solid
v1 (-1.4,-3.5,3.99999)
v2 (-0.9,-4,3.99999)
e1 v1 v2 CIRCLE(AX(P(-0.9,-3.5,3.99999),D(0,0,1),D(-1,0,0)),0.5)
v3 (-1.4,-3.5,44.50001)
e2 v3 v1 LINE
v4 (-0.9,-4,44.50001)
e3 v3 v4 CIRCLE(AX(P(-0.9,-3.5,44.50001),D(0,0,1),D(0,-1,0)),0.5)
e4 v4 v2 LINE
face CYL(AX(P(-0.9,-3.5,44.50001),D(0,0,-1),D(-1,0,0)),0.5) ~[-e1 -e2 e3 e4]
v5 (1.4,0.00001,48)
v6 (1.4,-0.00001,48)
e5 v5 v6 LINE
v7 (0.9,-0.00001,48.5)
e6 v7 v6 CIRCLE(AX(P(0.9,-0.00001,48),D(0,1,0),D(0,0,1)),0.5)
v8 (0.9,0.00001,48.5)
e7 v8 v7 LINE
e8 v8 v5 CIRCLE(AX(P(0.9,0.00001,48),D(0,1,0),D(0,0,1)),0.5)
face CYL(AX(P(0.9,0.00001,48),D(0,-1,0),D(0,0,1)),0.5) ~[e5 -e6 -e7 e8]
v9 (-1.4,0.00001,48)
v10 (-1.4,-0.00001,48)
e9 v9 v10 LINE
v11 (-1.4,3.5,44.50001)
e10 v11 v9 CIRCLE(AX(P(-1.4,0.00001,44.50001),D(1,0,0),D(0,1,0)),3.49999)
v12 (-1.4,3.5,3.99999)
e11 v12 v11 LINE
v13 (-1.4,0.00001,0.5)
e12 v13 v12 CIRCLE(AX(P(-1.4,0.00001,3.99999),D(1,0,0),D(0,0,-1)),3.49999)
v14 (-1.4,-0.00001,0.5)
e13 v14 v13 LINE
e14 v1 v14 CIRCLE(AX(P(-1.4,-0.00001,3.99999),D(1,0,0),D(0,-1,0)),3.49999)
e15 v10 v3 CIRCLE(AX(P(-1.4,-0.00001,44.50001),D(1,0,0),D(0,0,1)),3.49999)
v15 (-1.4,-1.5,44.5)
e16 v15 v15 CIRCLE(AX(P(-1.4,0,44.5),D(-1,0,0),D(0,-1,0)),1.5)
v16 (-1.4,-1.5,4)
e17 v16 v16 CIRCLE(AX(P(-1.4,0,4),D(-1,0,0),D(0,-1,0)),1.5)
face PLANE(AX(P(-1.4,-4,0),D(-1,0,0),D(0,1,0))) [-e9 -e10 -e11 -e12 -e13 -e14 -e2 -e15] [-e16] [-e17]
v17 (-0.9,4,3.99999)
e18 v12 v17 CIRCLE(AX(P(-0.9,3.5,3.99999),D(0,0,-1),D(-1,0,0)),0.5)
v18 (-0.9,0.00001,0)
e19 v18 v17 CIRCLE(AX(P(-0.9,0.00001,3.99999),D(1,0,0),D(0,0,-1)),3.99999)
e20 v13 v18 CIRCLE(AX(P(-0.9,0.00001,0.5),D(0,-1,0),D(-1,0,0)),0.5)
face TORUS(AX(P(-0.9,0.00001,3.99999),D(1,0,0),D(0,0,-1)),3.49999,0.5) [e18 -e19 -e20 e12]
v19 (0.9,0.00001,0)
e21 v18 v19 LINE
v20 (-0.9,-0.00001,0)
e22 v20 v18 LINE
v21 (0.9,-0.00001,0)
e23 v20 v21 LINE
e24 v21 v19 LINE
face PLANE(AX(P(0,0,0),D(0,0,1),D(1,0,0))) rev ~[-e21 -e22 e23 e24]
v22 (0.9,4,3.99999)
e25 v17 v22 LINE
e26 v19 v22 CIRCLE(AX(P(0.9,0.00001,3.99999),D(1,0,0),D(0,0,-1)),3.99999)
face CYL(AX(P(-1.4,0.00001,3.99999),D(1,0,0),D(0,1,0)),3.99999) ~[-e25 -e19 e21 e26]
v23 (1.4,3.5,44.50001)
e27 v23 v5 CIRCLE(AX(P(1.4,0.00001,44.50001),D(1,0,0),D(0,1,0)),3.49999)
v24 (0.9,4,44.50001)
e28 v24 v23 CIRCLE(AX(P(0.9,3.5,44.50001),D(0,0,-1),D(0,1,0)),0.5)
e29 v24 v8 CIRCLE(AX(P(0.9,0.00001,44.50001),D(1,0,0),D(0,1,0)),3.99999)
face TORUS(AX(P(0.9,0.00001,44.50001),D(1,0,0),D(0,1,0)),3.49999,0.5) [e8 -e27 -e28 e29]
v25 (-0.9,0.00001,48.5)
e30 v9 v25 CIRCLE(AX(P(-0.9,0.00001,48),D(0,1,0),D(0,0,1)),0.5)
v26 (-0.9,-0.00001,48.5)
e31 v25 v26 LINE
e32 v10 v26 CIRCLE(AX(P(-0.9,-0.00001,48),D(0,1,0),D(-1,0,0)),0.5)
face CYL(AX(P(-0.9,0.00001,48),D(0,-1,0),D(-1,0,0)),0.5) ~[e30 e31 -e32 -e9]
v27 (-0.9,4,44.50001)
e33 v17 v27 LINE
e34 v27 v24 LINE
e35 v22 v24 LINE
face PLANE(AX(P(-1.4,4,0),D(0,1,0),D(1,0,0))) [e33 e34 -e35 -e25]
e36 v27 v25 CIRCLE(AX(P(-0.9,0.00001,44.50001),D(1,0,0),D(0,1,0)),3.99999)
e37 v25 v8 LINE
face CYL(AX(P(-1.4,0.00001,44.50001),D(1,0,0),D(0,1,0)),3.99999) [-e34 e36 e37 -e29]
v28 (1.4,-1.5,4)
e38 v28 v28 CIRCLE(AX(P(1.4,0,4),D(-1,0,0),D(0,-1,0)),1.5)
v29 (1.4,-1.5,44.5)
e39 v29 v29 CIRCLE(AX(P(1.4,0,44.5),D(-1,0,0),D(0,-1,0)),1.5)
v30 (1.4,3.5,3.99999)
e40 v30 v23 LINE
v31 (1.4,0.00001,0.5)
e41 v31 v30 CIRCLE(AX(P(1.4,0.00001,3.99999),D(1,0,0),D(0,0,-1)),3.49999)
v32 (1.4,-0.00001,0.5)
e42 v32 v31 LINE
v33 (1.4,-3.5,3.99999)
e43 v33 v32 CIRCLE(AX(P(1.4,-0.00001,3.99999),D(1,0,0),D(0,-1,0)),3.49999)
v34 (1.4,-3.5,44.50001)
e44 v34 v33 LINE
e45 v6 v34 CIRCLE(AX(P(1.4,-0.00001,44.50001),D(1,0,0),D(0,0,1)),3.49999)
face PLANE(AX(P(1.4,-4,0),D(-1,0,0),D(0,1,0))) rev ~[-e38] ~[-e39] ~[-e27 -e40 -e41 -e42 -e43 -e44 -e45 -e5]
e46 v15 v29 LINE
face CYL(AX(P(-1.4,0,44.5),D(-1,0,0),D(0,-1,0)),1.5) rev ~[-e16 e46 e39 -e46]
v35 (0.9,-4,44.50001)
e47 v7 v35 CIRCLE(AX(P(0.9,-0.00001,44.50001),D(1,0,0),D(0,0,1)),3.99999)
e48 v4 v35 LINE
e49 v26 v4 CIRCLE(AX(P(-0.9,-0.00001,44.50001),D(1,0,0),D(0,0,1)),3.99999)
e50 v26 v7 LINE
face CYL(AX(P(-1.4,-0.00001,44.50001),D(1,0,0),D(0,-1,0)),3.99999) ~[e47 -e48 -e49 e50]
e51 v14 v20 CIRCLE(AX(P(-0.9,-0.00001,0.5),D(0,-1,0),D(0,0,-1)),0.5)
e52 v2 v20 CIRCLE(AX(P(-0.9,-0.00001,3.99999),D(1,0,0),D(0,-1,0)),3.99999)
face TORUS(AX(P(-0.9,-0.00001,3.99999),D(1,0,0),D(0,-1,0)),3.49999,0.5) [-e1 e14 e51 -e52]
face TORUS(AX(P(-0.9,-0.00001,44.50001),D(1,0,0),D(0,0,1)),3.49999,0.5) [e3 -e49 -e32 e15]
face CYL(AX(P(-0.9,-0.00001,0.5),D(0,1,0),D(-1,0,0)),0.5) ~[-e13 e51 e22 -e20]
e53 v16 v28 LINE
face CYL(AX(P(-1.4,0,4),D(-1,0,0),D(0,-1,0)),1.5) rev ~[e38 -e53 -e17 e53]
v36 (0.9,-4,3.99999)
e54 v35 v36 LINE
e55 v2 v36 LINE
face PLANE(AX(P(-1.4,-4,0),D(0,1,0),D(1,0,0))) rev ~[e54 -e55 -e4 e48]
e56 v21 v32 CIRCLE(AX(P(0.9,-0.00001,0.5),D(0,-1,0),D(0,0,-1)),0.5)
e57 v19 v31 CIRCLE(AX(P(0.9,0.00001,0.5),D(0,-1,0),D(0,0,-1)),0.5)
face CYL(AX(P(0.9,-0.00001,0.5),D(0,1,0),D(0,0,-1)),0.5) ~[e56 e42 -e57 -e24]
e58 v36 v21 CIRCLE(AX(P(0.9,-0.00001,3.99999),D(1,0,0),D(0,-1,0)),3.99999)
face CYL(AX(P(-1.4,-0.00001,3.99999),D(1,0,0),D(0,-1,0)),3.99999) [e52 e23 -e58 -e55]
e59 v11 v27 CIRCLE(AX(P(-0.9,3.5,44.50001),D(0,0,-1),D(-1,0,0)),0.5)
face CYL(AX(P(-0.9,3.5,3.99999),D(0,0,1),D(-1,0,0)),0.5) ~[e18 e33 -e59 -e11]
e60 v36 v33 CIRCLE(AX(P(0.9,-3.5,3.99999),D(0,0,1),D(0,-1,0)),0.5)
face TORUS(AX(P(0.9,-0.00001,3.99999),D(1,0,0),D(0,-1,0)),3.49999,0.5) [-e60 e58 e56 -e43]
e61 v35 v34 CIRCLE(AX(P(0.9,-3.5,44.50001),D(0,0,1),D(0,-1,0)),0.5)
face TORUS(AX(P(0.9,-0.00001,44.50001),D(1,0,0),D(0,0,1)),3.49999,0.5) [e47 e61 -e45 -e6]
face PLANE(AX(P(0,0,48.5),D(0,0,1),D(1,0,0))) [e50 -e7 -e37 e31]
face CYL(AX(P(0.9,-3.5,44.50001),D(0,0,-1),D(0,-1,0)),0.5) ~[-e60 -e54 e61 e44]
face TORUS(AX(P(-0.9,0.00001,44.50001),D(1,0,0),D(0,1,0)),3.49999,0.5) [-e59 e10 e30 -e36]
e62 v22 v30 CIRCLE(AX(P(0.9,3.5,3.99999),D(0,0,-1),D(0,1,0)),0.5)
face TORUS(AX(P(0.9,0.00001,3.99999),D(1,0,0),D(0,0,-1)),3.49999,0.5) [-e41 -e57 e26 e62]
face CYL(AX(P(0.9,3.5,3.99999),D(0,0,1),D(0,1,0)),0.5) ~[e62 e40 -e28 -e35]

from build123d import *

# Parameters (mm, degrees)
F0_W     = 2.8
F0_H     = 8
F1_DEPTH = 48.5
F2_R     = 3.99999
F3_R     = 1.5
F4_DEPTH = 5
F5_R     = 0.5


# Not quite as in the source:
# - a fillet or chamfer is up to 0.001 mm smaller than in the source, because OpenCascade refuses the exact size


with BuildPart() as f1:
    # F0 (on Top) → F1 (new body)
    with BuildSketch(Plane.XY):
        Rectangle(F0_W, F0_H)
    extrude(amount=F1_DEPTH)

    # F2 (radius 4 in the source; OpenCascade refuses exactly that, so slightly less here)
    f2_edges = [f1.edges().sort_by_distance(p)[0] for p in [
        (0, 4, 0),
        (0, -4, 0),
        (0, -4, 48.5),
        (0, 4, 48.5),
    ]]
    fillet(f2_edges, radius=F2_R)

    # F3 (on face) → F4 (cut)
    with BuildSketch(Plane(origin=(-1.4, 0, 0), x_dir=(0, -1, 0), z_dir=(-1, 0, 0))):
        with Locations((0, 4)):
            Circle(F3_R)
        with Locations((0, 44.5)):
            Circle(F3_R)
    extrude(amount=-F4_DEPTH, mode=Mode.SUBTRACT)

    # F5
    f5_edges = [f1.edges().sort_by_distance(p)[0] for p in [
        (-1.4, 4, 24.25),
        (1.4, 4, 24.25),
    ]]
    fillet(f5_edges, radius=F5_R)


solid = f1.part
